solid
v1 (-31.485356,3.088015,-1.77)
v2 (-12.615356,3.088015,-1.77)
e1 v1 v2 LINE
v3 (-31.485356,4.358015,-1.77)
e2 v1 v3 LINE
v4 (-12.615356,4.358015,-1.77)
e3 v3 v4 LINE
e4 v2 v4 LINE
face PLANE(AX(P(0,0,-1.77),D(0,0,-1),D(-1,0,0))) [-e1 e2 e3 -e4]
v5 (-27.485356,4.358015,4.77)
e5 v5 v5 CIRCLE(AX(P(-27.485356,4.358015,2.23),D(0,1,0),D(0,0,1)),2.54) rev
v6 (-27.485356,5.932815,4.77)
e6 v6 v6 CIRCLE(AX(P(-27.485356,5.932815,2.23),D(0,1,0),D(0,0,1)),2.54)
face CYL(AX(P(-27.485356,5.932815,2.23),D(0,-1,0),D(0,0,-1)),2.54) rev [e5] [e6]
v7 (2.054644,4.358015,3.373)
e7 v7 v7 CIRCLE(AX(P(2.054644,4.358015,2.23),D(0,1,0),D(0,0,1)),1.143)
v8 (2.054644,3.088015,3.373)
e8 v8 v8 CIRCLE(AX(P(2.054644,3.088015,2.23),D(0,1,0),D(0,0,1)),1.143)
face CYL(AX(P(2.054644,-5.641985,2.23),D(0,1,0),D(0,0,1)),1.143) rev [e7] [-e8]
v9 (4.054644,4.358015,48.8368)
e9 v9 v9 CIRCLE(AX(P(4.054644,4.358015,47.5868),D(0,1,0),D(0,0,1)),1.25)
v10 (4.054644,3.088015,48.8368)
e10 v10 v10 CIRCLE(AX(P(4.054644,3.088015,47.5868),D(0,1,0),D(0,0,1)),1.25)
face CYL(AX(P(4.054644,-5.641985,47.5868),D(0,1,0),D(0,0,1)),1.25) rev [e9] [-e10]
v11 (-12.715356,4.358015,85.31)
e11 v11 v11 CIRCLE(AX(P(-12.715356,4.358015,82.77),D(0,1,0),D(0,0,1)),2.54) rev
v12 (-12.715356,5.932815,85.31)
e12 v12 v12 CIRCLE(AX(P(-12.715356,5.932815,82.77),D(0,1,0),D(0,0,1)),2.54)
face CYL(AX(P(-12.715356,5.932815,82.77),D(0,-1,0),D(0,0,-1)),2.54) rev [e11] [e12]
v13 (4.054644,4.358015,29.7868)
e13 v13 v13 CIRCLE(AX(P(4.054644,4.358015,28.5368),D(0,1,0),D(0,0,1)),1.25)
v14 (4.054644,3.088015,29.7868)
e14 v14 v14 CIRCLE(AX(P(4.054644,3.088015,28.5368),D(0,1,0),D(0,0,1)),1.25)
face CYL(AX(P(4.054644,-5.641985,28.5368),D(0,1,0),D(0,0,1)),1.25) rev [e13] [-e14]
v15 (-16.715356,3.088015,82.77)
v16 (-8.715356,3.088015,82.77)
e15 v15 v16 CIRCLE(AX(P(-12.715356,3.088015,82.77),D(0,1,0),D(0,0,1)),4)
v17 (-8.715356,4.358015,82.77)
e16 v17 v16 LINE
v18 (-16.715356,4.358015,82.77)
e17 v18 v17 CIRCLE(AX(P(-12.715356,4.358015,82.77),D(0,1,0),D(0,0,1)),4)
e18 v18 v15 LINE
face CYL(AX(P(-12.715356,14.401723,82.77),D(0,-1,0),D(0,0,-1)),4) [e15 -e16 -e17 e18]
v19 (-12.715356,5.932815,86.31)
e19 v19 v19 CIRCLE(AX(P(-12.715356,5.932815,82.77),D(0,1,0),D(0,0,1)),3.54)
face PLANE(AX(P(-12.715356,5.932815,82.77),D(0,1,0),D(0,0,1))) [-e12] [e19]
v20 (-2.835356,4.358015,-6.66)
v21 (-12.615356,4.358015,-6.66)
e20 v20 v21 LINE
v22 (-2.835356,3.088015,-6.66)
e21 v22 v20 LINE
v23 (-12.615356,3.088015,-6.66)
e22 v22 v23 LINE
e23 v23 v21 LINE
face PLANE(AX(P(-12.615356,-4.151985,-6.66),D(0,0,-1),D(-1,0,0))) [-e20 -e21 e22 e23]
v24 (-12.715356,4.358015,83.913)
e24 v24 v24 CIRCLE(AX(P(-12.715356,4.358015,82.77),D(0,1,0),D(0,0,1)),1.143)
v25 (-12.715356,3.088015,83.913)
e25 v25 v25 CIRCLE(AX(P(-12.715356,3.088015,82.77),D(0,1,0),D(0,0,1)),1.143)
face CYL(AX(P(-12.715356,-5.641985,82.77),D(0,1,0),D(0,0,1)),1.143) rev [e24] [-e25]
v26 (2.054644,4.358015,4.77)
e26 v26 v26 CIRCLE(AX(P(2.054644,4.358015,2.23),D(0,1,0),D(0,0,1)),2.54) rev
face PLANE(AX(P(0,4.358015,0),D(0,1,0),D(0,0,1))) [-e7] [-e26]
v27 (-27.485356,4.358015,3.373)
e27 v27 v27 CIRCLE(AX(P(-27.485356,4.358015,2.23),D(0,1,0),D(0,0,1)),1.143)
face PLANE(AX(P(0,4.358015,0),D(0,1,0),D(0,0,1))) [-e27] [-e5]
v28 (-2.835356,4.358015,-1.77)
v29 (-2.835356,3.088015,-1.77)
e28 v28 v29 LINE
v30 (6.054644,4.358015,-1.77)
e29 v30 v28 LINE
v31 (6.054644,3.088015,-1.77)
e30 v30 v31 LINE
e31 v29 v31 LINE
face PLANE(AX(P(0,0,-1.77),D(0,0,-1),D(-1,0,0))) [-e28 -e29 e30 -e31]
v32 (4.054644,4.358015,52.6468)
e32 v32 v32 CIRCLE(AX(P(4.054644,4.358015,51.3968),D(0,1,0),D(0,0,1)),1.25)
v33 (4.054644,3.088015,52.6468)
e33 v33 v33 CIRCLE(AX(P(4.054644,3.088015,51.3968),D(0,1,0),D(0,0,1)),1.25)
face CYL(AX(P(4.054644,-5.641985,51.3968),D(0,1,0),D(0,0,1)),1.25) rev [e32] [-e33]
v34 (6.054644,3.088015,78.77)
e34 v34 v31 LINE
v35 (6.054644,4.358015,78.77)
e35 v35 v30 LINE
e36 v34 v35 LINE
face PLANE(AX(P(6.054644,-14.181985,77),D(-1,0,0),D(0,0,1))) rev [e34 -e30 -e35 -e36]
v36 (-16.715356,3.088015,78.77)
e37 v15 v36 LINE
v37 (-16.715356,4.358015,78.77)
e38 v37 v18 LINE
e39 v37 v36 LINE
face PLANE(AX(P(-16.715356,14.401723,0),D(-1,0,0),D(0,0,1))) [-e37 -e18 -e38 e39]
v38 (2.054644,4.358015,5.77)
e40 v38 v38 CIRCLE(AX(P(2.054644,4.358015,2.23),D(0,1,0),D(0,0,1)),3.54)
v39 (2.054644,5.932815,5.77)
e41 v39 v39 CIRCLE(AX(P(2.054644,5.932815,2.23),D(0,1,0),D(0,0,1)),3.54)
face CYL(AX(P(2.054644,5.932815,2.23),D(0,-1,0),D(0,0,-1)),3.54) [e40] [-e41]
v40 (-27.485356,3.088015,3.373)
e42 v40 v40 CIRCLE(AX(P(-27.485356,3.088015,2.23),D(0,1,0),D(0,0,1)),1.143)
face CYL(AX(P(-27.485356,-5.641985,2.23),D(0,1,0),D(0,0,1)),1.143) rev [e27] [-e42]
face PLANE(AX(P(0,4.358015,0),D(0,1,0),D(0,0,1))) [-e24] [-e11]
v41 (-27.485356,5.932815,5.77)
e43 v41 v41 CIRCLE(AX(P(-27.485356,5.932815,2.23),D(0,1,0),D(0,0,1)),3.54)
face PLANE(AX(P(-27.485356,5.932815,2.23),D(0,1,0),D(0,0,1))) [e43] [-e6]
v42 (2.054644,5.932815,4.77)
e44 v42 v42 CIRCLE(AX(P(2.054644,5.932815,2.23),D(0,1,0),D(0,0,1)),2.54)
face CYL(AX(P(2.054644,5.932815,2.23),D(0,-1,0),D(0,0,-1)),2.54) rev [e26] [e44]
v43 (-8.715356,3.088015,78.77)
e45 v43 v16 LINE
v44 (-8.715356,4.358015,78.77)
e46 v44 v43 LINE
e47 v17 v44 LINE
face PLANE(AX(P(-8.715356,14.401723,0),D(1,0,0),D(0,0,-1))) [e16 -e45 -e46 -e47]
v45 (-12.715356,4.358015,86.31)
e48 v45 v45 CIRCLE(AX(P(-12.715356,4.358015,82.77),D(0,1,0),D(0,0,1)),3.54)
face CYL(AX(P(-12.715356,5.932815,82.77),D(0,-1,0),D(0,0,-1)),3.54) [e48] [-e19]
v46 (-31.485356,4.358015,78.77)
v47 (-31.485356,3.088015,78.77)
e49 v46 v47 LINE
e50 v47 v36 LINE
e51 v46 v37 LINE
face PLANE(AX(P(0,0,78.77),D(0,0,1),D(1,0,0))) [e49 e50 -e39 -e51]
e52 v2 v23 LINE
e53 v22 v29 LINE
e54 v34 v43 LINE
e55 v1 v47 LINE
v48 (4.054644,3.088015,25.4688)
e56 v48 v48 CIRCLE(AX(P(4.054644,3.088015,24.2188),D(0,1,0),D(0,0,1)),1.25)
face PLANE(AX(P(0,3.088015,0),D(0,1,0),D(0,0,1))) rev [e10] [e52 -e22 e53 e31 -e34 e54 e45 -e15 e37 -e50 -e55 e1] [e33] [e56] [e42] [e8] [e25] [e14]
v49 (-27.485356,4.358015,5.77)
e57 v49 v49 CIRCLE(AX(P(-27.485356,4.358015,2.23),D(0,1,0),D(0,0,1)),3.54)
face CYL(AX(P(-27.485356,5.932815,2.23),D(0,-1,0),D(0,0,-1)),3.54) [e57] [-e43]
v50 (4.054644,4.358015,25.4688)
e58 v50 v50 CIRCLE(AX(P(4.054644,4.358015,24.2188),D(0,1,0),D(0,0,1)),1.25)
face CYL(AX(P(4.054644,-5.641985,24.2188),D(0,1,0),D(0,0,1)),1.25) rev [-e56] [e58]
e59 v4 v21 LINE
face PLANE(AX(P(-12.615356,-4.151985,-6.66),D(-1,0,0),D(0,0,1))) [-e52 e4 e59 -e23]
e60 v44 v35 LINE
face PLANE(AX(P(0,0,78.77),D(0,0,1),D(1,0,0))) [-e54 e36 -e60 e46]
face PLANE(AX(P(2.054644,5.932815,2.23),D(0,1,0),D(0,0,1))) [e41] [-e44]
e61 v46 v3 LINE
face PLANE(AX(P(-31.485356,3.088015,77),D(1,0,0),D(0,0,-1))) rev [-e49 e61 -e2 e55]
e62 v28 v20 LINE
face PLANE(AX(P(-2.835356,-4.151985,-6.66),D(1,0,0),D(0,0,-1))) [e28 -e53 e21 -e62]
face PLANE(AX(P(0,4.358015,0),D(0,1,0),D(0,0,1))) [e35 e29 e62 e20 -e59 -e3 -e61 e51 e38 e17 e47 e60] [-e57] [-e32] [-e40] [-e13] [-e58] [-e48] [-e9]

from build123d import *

# Parameters (mm, degrees)
BOSS_EXTRUDE1_DEPTH                  = 77
SKETCH3_W                            = 37.54
SKETCH3_H                            = 17.27
BOSS_EXTRUDE2_DEPTH                  = 1.77
SKETCH4_W                            = 37.54
SKETCH4_H                            = 17.27
BOSS_EXTRUDE3_DEPTH                  = 1.77
SKETCH5_W                            = 4
SKETCH5_H                            = 16
CUT_EXTRUDE2_DEPTH                   = 1.77
SKETCH6_W                            = 9.78
SKETCH6_H                            = 11.05
SKETCH6_W_2                          = 7.24
SKETCH6_H_2                          = 7.24
BUTTON_WALLS_DEPTH                   = 7.24
SKETCH7_W                            = 9.78
SKETCH7_H                            = 11.05
BUTTON_BOTTOM_DEPTH                  = 1.27
SKETCH8_W                            = 7.24
SKETCH8_H                            = 1.77
BUTTON_CUTOUT_MIDDLE_DEPTH           = 7.24
SKETCH9_W                            = 4.45
SKETCH9_H                            = 1.27
SKETCH9_W_2                          = 3.37
SKETCH9_H_2                          = 4.39
BUTTON_CUTOUT_FRONT_BACK_DEPTH       = 7.24
SKETCH10_W                           = 3.37
SKETCH10_H                           = 4.39
BUTTON_CUTOUT_BOTTOM_DEPTH           = 1.27
BUTTON_CHAMFER1_SIZE                 = 5
SKETCH12_W                           = 35
SKETCH12_H                           = 1.77
SKETCH12_W_2                         = 1.77
SKETCH12_H_2                         = 10
SKETCH12_W_3                         = 7.5
SKETCH12_R                           = 0.9652
SKETCH12_H_3                         = 7
SUPPORT_PCB_BATTERY_DEPTH            = 7
SKETCH13_R                           = 1.25
SKETCH13_W                           = 8.8
SKETCH13_H                           = 4.8
CUTOUT_USB_3_LEDS_DEPTH              = 1.77
SKETCH16_W                           = 1.77
SKETCH16_H                           = 1.77
TAB_PCB_RETAINER_LEN_DEPTH           = 3
SKETCH17_W                           = 4
SKETCH17_H                           = 1.77
CUTOUT_BACK_MOT_WIRES_DEPTH          = 9
SKETCH18_R                           = 1.25
CUTOUT_CHG_DONE_LED_DEPTH            = 10
SKETCH19_W                           = 4.2
SKETCH19_H                           = 1.77
TAB_PCB_RETAINERS_WIDTH_DEPTH        = 10
CUTOUT_RETAINER_TAB_1_DEPTH          = 1.77
CUTOUT_RETAINER_TAB_2_DEPTH          = 1.77
SKETCH23_W                           = 8
SKETCH23_H                           = 8
SKETCH23_R                           = 0.9652
CASING_SCREW_POSTS_DEPTH             = 17.27
SKETCH24_R                           = 0.9652
EXTRUDE_LID_DEPTH                    = 1.27
SKETCH25_W                           = 118.370576462
SKETCH25_H                           = 160.815259781
REMOVE_BOX_MATERIAL_DEPTH            = 17.27
SKETCH26_R                           = 1.143
THRU_HOLE_NO2_THREAD_96001A164_DEPTH = 10
SKETCH27_R                           = 3.54
SKETCH27_R_2                         = 2.54
SCREW_HEAD_RECESS_DEPTH              = 1.5748
SKETCH28_R                           = 1.25
CUTOUT_LEDS_DEPTH                    = 10


with BuildPart() as part:
    # Sketch2 → Boss-Extrude1 (new body)
    with BuildSketch(Plane.XY):
        Polygon((-30.215355805, 3.088014981), (-30.215355805, -12.911985019), (4.784644195, -12.911985019), (4.784644195, 3.088014981), (6.054644195, 3.088014981), (6.054644195, -14.181985019), (-31.485355805, -14.181985019), (-31.485355805, 3.088014981), align=None)
    extrude(amount=BOSS_EXTRUDE1_DEPTH)

    # Sketch3 → Boss-Extrude2 (add)
    with BuildSketch(Plane.XY.offset(77)):
        with Locations((-12.715355805, -5.546985019)):
            Rectangle(SKETCH3_W, SKETCH3_H)
    extrude(amount=BOSS_EXTRUDE2_DEPTH)

    # Sketch4 → Boss-Extrude3 (add)
    with BuildSketch(Plane(origin=(0, 0, 0), x_dir=(-1, 0, 0), z_dir=(0, 0, -1))):
        with Locations((12.715355805, -5.546985019)):
            Rectangle(SKETCH4_W, SKETCH4_H)
    extrude(amount=BOSS_EXTRUDE3_DEPTH)

    # Sketch5 → Cut-Extrude2 (cut)
    with BuildSketch(Plane(origin=(0, 0, -1.77), x_dir=(-1, 0, 0), z_dir=(0, 0, -1))):
        with Locations((19.215355805, -4.911985019)):
            Rectangle(SKETCH5_W, SKETCH5_H)
    extrude(amount=-CUT_EXTRUDE2_DEPTH, mode=Mode.SUBTRACT)

    # Sketch6 → button_walls (add)
    with BuildSketch(Plane(origin=(0, 3.088014981, 0), x_dir=(1, 0, 0), z_dir=(0, 1, 0))):
        with Locations((-7.725355805, 1.135)):
            Rectangle(SKETCH6_W, SKETCH6_H)
        with Locations((-7.725355805, 1.77)):
            Rectangle(SKETCH6_W_2, SKETCH6_H_2, mode=Mode.SUBTRACT)
    extrude(amount=-BUTTON_WALLS_DEPTH)

    # Sketch7 → button_bottom (add)
    with BuildSketch(Plane.XZ.offset(4.151985019)):
        with Locations((-7.725355805, -1.135)):
            Rectangle(SKETCH7_W, SKETCH7_H)
    extrude(amount=BUTTON_BOTTOM_DEPTH)

    # Sketch8 → button_cutout_middle (cut)
    with BuildSketch(Plane(origin=(0, 3.088014981, 0), x_dir=(1, 0, 0), z_dir=(0, 1, 0))):
        with Locations((-7.725355805, 0.885)):
            Rectangle(SKETCH8_W, SKETCH8_H)
    extrude(amount=-BUTTON_CUTOUT_MIDDLE_DEPTH, mode=Mode.SUBTRACT)

    # Sketch9 → button_cutout_front_back (cut)
    with BuildSketch(Plane(origin=(0, 3.088014981, 0), x_dir=(1, 0, 0), z_dir=(0, 1, 0))):
        with Locations((-7.720355805, 6.025)):
            Rectangle(SKETCH9_W, SKETCH9_H)
        with Locations((-10.930355805, -2.195)):
            Rectangle(SKETCH9_W_2, SKETCH9_H_2)
        with Locations((-4.520355805, -2.195)):
            Rectangle(SKETCH9_W_2, SKETCH9_H_2)
    extrude(amount=-BUTTON_CUTOUT_FRONT_BACK_DEPTH, mode=Mode.SUBTRACT)

    # Sketch10 → button_cutout_bottom (cut)
    with BuildSketch(Plane(origin=(0, -4.151985019, 0), x_dir=(1, 0, 0), z_dir=(0, 1, 0))):
        with Locations((-10.930355805, -2.195)):
            Rectangle(SKETCH10_W, SKETCH10_H)
        with Locations((-4.520355805, -2.195)):
            Rectangle(SKETCH10_W, SKETCH10_H)
    extrude(amount=-BUTTON_CUTOUT_BOTTOM_DEPTH, mode=Mode.SUBTRACT)

    # button_Chamfer1
    # the kernel refuses this chamfer: 5 mm, written as the material it adds along each edge
    with BuildSketch(Plane(origin=(-6.205355805, -5.421985019, 0), x_dir=(0, -0.9996219169112968, -0.027495876610586372), z_dir=(-1, 0, 0))) as button_chamfer1_piece_1_section:
        Polygon((BUTTON_CHAMFER1_SIZE * 0.999621916911, BUTTON_CHAMFER1_SIZE * 0.0274958766106), (-BUTTON_CHAMFER1_SIZE * 0.0274958766106, BUTTON_CHAMFER1_SIZE * 0.999621916911), (0, 0), align=None)
    button_chamfer1_piece_1 = extrude(amount=3.04, mode=Mode.PRIVATE)
    button_chamfer1_piece_1 = split(button_chamfer1_piece_1, bisect_by=Plane(origin=(-7.725355805, -7.110612501, 4.39), z_dir=(0, 0, -1)), keep=Keep.TOP, mode=Mode.PRIVATE)
    add(button_chamfer1_piece_1)

    # Sketch12 → support_pcb_battery (add)
    # profile 1 of 5: a face of its own
    with BuildSketch(Plane(origin=(0, -12.911985019, 0), x_dir=(1, 0, 0), z_dir=(0, 1, 0))):
        with Locations((-12.715355805, -76.115)):
            Rectangle(SKETCH12_W, SKETCH12_H)
    # profile 2 of 5: a face of its own
    with BuildSketch(Plane(origin=(0, -12.911985019, 0), x_dir=(1, 0, 0), z_dir=(0, 1, 0))):
        with Locations((-27.100355805, -60.23)):
            Rectangle(SKETCH12_W_2, SKETCH12_H_2)
    # profile 3 of 5: a face of its own
    with BuildSketch(Plane(origin=(0, -12.911985019, 0), x_dir=(1, 0, 0), z_dir=(0, 1, 0))):
        with Locations((1.034644195, -36.845)):
            Rectangle(SKETCH12_W_3, SKETCH12_H)
    # profile 4 of 5: a face of its own
    with BuildSketch(Plane(origin=(0, -12.911985019, 0), x_dir=(1, 0, 0), z_dir=(0, 1, 0))):
        with BuildLine():
            Line((-25.783918863, -37.73), (-19.764792747, -37.73))
            ThreePointArc((-19.764792747, -37.73), (-22.774355805, -30.7466), (-25.783918863, -37.73))
        make_face()
        with Locations(Location((-22.774355805, -34.8868, 0), (0, 0, 270))):
            Circle(SKETCH12_R, mode=Mode.SUBTRACT)
    # profile 5 of 5: a face of its own
    with BuildSketch(Plane(origin=(0, -12.911985019, 0), x_dir=(1, 0, 0), z_dir=(0, 1, 0))):
        with Locations((-12.100355805, -23.33)):
            Rectangle(SKETCH12_W_2, SKETCH12_H_3)
    extrude(amount=SUPPORT_PCB_BATTERY_DEPTH)

    # Sketch13 → cutout_usb_3_leds (cut)
    with BuildSketch(Plane(origin=(6.054644195, 0, 0), x_dir=(0, 0, -1), z_dir=(1, 0, 0))):
        with Locations((-51.3968, -3.411985019)):
            Circle(SKETCH13_R)
        with Locations((-47.5868, -3.411985019)):
            Circle(SKETCH13_R)
        with Locations((-24.2188, -3.411985019)):
            Circle(SKETCH13_R)
        with Locations((-34.8868, -3.411985019)):
            Rectangle(SKETCH13_W, SKETCH13_H)
    extrude(amount=-CUTOUT_USB_3_LEDS_DEPTH, mode=Mode.SUBTRACT)

    # Sketch16 → tab_pcb_retainer_len (add)
    with BuildSketch(Plane(origin=(0, -5.911985019, 0), x_dir=(1, 0, 0), z_dir=(0, 1, 0))):
        with Locations((-12.100355805, -20.715)):
            Rectangle(SKETCH16_W, SKETCH16_H)
    extrude(amount=TAB_PCB_RETAINER_LEN_DEPTH)

    # Sketch17 → cutout_back_mot_wires (cut)
    with BuildSketch(Plane(origin=(0, 3.088014981, 0), x_dir=(1, 0, 0), z_dir=(0, 1, 0))):
        with Locations((-20.361355805, -77.885)):
            Rectangle(SKETCH17_W, SKETCH17_H)
    extrude(amount=-CUTOUT_BACK_MOT_WIRES_DEPTH, mode=Mode.SUBTRACT)

    # Sketch18 → cutout_chg_done_led (cut)
    with BuildSketch(Plane(origin=(6.054644195, 0, 0), x_dir=(0, 0, -1), z_dir=(1, 0, 0))):
        with Locations((-28.5368, -3.411985019)):
            Circle(SKETCH18_R)
    extrude(amount=-CUTOUT_CHG_DONE_LED_DEPTH, mode=Mode.SUBTRACT)

    # Sketch19 → tab_pcb_retainers_width (add)
    with BuildSketch(Plane(origin=(0, -12.911985019, 0), x_dir=(1, 0, 0), z_dir=(0, 1, 0))):
        with Locations((-28.115355805, -68.615)):
            Rectangle(SKETCH19_W, SKETCH19_H)
        with Locations((-28.115355805, -46.115)):
            Rectangle(SKETCH19_W, SKETCH19_H)
        with Locations((-28.115355805, -28.115)):
            Rectangle(SKETCH19_W, SKETCH19_H)
    extrude(amount=TAB_PCB_RETAINERS_WIDTH_DEPTH)

    # Sketch20 → cutout_retainer_tab_1 (cut)
    with BuildSketch(Plane.XY.offset(69.5)):
        Polygon((-26.015355805, -12.911985019), (-26.015355805, -5.911985019), (-28.445355805, -10.120868481), (-28.445355805, -12.911985019), align=None)
    extrude(amount=-CUTOUT_RETAINER_TAB_1_DEPTH, mode=Mode.SUBTRACT)

    # Sketch21 → cutout_retainer_tab_2 (cut)
    with BuildSketch(Plane.XY.offset(47)):
        Polygon((-26.015355805, -5.911985019), (-28.445355805, -10.120868481), (-28.445355805, -12.911985019), (-26.015355805, -12.911985019), align=None)
    extrude(amount=-CUTOUT_RETAINER_TAB_2_DEPTH, mode=Mode.SUBTRACT)

    # Sketch23 → casing_screw_posts (add)
    # profile 1 of 3: a face of its own
    with BuildSketch(Plane.XZ.offset(14.181985019)):
        with Locations((2.054644195, 2.23)):
            Rectangle(SKETCH23_W, SKETCH23_H)
        with Locations(Location((2.054644195, 2.23, 0), (0, 0, 270))):
            Circle(SKETCH23_R, mode=Mode.SUBTRACT)
    # profile 2 of 3: a face of its own
    with BuildSketch(Plane.XZ.offset(14.181985019)):
        with Locations((-27.485355805, 2.23)):
            Rectangle(SKETCH23_W, SKETCH23_H)
        with Locations(Location((-27.485355805, 2.23, 0), (0, 0, 270))):
            Circle(SKETCH23_R, mode=Mode.SUBTRACT)
    # profile 3 of 3: a face of its own
    with BuildSketch(Plane.XZ.offset(14.181985019)):
        with BuildLine():
            Line((-16.715355805, 82.77), (-16.715355805, 78.77))
            Line((-16.715355805, 78.77), (-8.715355805, 78.77))
            Line((-8.715355805, 78.77), (-8.715355805, 82.77))
            ThreePointArc((-8.715355805, 82.77), (-12.715355805, 86.77), (-16.715355805, 82.77))
        make_face()
        with Locations(Location((-12.715355805, 82.77, 0), (0, 0, 270))):
            Circle(SKETCH23_R, mode=Mode.SUBTRACT)
    extrude(amount=-CASING_SCREW_POSTS_DEPTH)

    # Sketch24 → extrude_lid (add)
    # profile 1 of 2: a face of its own
    with BuildSketch(Plane(origin=(0, 3.088014981, 0), x_dir=(1, 0, 0), z_dir=(0, 1, 0))):
        with BuildLine():
            Line((-8.715355805, -78.77), (6.054644195, -78.77))
            Line((6.054644195, -78.77), (6.054644195, 1.77))
            Line((6.054644195, 1.77), (-2.835355805, 1.77))
            Line((-2.835355805, 1.77), (-2.835355805, 6.66))
            Line((-2.835355805, 6.66), (-5.495355805, 6.66))
            Line((-5.495355805, 6.66), (-5.495355805, 5.39))
            Line((-5.495355805, 5.39), (-4.105355805, 5.39))
            Line((-4.105355805, 5.39), (-4.105355805, 0))
            Line((-4.105355805, 0), (-1.945355805, 0))
            Line((-1.945355805, 0), (-1.945355805, -6.23))
            Line((-1.945355805, -6.23), (4.784644195, -6.23))
            Line((4.784644195, -6.23), (4.784644195, -77))
            Line((4.784644195, -77), (-18.361355805, -77))
            Line((-18.361355805, -77), (-18.361355805, -78.77))
            Line((-18.361355805, -78.77), (-16.715355805, -78.77))
            Line((-16.715355805, -78.77), (-16.715355805, -82.77))
            ThreePointArc((-16.715355805, -82.77), (-12.715355805, -86.77), (-8.715355805, -82.77))
            Line((-8.715355805, -82.77), (-8.715355805, -78.77))
        make_face()
        with Locations(Location((-12.715355805, -82.77, 0), (0, 0, 90))):
            Circle(SKETCH24_R, mode=Mode.SUBTRACT)
        with Locations(Location((2.054644195, -2.23, 0), (0, 0, 90))):
            Circle(SKETCH24_R, mode=Mode.SUBTRACT)
    # profile 2 of 2: a face of its own
    with BuildSketch(Plane(origin=(0, 3.088014981, 0), x_dir=(1, 0, 0), z_dir=(0, 1, 0))):
        Polygon((-31.485355805, -78.77), (-18.361355805, -78.77), (-18.361355805, -77), (4.784644195, -77), (4.784644195, -6.23), (-1.945355805, -6.23), (-1.945355805, 0), (-4.105355805, 0), (-4.105355805, 5.39), (-5.495355805, 5.39), (-5.495355805, 6.66), (-12.615355805, 6.66), (-12.615355805, 1.77), (-31.485355805, 1.77), align=None)
        with Locations(Location((-27.485355805, -2.23, 0), (0, 0, 90))):
            Circle(SKETCH24_R, mode=Mode.SUBTRACT)
    extrude(amount=EXTRUDE_LID_DEPTH)

    # Sketch25 → remove_box_material (cut)
    with BuildSketch(Plane.XZ.offset(14.181985019)):
        with Locations((-13.638066312, 39.395921067)):
            Rectangle(SKETCH25_W, SKETCH25_H)
    extrude(amount=-REMOVE_BOX_MATERIAL_DEPTH, mode=Mode.SUBTRACT)

    # Sketch26 → thru_hole_no2_thread_96001A164 (cut)
    with BuildSketch(Plane(origin=(0, 4.358014981, 0), x_dir=(1, 0, 0), z_dir=(0, 1, 0))):
        with Locations(Location((-27.485355805, -2.23, 0), (0, 0, 270))):
            Circle(SKETCH26_R)
        with Locations(Location((2.054644195, -2.23, 0), (0, 0, 270))):
            Circle(SKETCH26_R)
        with Locations(Location((-12.715355805, -82.77, 0), (0, 0, 270))):
            Circle(SKETCH26_R)
    extrude(amount=-THRU_HOLE_NO2_THREAD_96001A164_DEPTH, mode=Mode.SUBTRACT)

    # Sketch27 → screw_head_recess (add)
    # profile 1 of 3: a face of its own
    with BuildSketch(Plane(origin=(0, 4.358014981, 0), x_dir=(1, 0, 0), z_dir=(0, 1, 0))):
        with Locations(Location((-12.715355805, -82.77, 0), (0, 0, 270))):
            Circle(SKETCH27_R)
        with Locations(Location((-12.715355805, -82.77, 0), (0, 0, 270))):
            Circle(SKETCH27_R_2, mode=Mode.SUBTRACT)
    # profile 2 of 3: a face of its own
    with BuildSketch(Plane(origin=(0, 4.358014981, 0), x_dir=(1, 0, 0), z_dir=(0, 1, 0))):
        with Locations(Location((-27.485355805, -2.23, 0), (0, 0, 270))):
            Circle(SKETCH27_R)
        with Locations(Location((-27.485355805, -2.23, 0), (0, 0, 270))):
            Circle(SKETCH27_R_2, mode=Mode.SUBTRACT)
    # profile 3 of 3: a face of its own
    with BuildSketch(Plane(origin=(0, 4.358014981, 0), x_dir=(1, 0, 0), z_dir=(0, 1, 0))):
        with Locations(Location((2.054644195, -2.23, 0), (0, 0, 270))):
            Circle(SKETCH27_R)
        with Locations(Location((2.054644195, -2.23, 0), (0, 0, 270))):
            Circle(SKETCH27_R_2, mode=Mode.SUBTRACT)
    extrude(amount=SCREW_HEAD_RECESS_DEPTH)

    # Sketch28 → cutout_leds (cut)
    with BuildSketch(Plane(origin=(0, 4.358014981, 0), x_dir=(1, 0, 0), z_dir=(0, 1, 0))):
        with Locations(Location((4.054644195, -51.3968, 0), (0, 0, 270))):
            Circle(SKETCH28_R)
        with Locations(Location((4.054644195, -47.5868, 0), (0, 0, 270))):
            Circle(SKETCH28_R)
        with Locations(Location((4.054644195, -28.5368, 0), (0, 0, 270))):
            Circle(SKETCH28_R)
        with Locations(Location((4.054644195, -24.2188, 0), (0, 0, 270))):
            Circle(SKETCH28_R)
    extrude(amount=-CUTOUT_LEDS_DEPTH, mode=Mode.SUBTRACT)


solid = part.part
